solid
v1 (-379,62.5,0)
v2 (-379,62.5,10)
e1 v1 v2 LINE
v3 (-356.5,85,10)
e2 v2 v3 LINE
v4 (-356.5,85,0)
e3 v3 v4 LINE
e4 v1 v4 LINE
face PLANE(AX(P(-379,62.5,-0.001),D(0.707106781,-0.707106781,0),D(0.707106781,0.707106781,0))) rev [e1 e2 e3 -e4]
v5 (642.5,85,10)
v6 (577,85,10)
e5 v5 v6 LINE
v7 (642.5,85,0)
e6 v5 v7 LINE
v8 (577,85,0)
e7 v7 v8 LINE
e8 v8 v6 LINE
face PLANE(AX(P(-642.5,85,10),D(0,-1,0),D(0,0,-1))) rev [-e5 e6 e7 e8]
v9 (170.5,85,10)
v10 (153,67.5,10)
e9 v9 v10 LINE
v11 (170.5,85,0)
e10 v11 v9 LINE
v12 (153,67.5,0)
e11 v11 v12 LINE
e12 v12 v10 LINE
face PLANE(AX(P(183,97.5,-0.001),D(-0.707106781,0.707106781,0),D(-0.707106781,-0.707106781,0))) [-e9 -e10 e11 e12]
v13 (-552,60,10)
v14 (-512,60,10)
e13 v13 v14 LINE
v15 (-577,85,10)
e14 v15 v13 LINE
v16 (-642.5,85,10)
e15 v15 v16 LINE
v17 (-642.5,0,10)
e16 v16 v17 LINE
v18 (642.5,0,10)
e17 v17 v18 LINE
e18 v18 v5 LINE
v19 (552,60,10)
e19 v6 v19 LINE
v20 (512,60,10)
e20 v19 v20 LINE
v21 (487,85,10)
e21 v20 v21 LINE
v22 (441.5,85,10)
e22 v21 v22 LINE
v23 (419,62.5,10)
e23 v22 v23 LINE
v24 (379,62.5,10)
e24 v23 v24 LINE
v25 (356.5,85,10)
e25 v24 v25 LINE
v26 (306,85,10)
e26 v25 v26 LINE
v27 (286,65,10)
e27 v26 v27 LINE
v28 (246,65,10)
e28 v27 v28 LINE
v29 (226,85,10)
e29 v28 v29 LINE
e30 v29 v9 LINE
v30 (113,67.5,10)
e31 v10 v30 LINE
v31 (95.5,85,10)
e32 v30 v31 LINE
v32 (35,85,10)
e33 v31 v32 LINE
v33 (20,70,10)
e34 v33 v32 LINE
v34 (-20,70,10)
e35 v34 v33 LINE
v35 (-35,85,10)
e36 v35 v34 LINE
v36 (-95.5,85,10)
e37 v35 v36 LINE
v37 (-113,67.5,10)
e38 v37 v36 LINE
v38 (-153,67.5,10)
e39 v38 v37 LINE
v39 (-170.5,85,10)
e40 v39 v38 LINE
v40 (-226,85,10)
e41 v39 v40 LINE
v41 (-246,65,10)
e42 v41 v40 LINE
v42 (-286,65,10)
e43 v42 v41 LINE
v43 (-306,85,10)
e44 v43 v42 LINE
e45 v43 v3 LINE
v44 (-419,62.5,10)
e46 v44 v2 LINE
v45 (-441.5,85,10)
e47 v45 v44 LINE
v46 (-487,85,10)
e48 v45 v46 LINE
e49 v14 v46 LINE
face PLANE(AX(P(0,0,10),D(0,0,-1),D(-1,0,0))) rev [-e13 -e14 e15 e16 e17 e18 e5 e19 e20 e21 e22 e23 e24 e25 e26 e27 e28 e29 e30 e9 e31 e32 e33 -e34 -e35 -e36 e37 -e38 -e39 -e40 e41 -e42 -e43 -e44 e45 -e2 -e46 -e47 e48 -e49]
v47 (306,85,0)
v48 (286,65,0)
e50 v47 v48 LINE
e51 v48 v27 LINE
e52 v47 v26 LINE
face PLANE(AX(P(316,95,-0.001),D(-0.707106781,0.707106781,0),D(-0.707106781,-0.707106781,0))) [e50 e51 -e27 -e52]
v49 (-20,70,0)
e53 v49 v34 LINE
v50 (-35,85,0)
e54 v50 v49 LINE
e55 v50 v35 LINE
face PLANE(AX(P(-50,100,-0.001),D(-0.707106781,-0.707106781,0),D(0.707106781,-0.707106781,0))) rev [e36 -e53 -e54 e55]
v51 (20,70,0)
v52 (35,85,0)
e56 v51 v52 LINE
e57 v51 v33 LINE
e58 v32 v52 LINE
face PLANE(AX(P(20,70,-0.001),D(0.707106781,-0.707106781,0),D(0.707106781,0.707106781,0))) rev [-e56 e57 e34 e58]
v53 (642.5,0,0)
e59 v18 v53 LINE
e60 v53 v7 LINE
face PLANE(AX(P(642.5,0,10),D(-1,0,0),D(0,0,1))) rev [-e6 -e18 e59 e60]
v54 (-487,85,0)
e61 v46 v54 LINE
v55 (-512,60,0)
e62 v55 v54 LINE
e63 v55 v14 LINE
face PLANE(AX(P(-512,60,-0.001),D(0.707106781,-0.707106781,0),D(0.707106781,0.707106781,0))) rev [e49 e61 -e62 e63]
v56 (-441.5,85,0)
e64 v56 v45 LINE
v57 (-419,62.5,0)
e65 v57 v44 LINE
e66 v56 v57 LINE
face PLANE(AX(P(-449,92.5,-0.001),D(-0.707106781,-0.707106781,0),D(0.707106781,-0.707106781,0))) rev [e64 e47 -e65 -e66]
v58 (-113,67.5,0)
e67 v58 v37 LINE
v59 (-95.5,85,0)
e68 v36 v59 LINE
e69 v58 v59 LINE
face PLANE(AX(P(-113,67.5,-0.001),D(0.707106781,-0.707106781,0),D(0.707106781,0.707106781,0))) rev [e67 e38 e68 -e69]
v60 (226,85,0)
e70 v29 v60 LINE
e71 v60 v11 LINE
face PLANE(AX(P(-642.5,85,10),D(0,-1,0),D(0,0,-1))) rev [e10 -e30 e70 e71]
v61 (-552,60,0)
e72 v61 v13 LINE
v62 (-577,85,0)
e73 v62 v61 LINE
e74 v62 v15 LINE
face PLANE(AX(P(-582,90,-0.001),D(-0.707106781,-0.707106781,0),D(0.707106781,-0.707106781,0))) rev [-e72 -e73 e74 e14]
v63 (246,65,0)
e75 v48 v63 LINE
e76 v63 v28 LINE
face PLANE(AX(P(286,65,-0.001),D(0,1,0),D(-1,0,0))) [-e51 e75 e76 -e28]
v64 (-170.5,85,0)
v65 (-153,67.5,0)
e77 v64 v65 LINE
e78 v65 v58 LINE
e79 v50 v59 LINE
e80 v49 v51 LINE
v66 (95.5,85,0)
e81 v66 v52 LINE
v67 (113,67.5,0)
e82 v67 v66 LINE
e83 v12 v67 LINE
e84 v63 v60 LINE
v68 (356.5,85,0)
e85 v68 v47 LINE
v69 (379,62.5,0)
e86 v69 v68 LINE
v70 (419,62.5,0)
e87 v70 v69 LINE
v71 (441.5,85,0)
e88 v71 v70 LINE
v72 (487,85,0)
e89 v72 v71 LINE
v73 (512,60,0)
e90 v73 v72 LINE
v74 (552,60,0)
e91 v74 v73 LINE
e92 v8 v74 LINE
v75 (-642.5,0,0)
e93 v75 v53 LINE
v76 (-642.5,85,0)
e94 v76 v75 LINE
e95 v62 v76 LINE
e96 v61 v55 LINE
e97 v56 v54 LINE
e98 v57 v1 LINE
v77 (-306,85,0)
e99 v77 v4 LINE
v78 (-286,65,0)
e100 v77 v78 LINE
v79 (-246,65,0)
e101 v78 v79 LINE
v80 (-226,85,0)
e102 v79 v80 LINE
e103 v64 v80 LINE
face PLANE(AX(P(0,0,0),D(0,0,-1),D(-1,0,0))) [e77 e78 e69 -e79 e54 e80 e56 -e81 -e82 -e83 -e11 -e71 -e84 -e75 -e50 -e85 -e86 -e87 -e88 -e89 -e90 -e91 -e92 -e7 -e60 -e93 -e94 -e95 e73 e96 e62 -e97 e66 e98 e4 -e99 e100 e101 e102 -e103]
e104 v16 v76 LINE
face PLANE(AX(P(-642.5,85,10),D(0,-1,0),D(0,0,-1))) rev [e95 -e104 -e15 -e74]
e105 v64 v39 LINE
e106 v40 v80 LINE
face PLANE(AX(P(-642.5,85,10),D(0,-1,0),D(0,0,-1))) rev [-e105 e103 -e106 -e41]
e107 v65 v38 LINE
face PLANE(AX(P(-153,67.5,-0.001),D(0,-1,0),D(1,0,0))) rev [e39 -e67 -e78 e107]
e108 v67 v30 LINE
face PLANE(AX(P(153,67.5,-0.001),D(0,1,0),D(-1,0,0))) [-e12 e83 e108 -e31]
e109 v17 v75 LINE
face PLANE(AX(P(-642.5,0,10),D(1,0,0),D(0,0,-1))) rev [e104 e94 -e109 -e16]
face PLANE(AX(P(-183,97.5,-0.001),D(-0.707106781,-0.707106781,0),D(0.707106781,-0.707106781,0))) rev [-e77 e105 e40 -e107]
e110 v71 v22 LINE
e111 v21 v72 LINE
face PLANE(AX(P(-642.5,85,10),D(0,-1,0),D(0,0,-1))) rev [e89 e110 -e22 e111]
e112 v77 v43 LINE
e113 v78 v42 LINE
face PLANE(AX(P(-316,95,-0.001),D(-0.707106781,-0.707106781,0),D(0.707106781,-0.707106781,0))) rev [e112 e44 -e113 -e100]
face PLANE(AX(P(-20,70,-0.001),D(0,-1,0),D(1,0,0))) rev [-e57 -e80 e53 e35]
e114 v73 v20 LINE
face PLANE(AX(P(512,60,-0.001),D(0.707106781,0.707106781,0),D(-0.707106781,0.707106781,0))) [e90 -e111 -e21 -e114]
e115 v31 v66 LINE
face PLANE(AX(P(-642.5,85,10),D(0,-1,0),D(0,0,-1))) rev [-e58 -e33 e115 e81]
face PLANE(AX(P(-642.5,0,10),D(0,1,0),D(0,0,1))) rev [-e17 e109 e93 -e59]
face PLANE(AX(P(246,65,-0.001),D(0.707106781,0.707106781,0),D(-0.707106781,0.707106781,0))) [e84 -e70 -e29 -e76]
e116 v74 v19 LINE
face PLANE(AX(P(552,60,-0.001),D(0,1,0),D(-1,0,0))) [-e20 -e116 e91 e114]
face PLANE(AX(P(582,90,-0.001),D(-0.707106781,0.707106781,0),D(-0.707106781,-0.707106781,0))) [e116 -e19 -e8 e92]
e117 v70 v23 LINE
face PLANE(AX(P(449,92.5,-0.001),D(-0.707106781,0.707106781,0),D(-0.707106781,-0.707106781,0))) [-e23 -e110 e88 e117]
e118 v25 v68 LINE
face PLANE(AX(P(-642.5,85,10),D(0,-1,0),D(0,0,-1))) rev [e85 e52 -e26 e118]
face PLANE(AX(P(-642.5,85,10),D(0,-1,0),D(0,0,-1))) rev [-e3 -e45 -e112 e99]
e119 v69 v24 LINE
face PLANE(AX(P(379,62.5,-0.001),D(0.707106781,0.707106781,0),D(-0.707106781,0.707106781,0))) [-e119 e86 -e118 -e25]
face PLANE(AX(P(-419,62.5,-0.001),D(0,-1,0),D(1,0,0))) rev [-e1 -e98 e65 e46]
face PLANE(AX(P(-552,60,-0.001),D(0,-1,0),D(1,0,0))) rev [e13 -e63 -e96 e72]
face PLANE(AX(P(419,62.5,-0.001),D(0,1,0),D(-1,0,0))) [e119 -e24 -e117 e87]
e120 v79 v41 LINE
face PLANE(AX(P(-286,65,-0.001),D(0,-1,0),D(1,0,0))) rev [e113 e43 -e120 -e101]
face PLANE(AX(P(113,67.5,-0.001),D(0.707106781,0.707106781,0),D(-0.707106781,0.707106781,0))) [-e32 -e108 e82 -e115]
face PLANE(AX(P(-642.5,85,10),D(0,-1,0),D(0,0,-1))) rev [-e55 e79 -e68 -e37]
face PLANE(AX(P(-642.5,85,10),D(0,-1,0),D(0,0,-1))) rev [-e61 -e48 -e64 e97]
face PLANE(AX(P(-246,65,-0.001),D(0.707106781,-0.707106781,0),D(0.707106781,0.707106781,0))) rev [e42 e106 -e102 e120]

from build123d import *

# Parameters (mm, degrees)
SKETCH1_W             = 1285
SKETCH1_H             = 85
BOSS_EXTRUDE1_DEPTH   = 10
CUT_EXTRUDE1_REACH    = 650.175
SKETCH_PATTERN1_DEPTH = 10


# Read off the part's stored shape, not the designer's step: Sketch-Pattern1
with BuildPart() as part:
    # Sketch1 → Boss-Extrude1 (new body)
    with BuildSketch(Plane.XY):
        with Locations((0, 42.5)):
            Rectangle(SKETCH1_W, SKETCH1_H)
    extrude(amount=BOSS_EXTRUDE1_DEPTH)

    # Sketch2 → Cut-Extrude1 (cut, up to next)
    with BuildSketch(Plane.XY.offset(10), mode=Mode.PRIVATE) as cut_extrude1_sk1:
        Polygon((-50, 100), (-20, 70), (20, 70), (50, 100), align=None)
    cut_extrude1_tool1 = extrude(cut_extrude1_sk1.sketch, amount=-CUT_EXTRUDE1_REACH, mode=Mode.PRIVATE) & part.part
    add(cut_extrude1_tool1.solids().sort_by_distance((0, 87.142857, 10))[0], mode=Mode.SUBTRACT)

    # Sketch-Pattern1 outline → Sketch-Pattern1 (cut)
    with BuildSketch(Plane.XY):
        Polygon((-286, 65), (-246, 65), (-226, 85), (-306, 85), align=None)
        Polygon((-512, 60), (-487, 85), (-577, 85), (-552, 60), align=None)
        Polygon((-379, 62.5), (-356.5, 85), (-441.5, 85), (-419, 62.5), align=None)
        Polygon((-95.5, 85), (-170.5, 85), (-153, 67.5), (-113, 67.5), align=None)
    sketch_pattern1 = extrude(amount=SKETCH_PATTERN1_DEPTH, mode=Mode.SUBTRACT)

    # Mirror1: Sketch-Pattern1 across plane
    add(sketch_pattern1.mirror(Plane(origin=(0, 0, 0), x_dir=(0, 0, 1), z_dir=(1, 0, 0))), mode=Mode.SUBTRACT)


solid = part.part
